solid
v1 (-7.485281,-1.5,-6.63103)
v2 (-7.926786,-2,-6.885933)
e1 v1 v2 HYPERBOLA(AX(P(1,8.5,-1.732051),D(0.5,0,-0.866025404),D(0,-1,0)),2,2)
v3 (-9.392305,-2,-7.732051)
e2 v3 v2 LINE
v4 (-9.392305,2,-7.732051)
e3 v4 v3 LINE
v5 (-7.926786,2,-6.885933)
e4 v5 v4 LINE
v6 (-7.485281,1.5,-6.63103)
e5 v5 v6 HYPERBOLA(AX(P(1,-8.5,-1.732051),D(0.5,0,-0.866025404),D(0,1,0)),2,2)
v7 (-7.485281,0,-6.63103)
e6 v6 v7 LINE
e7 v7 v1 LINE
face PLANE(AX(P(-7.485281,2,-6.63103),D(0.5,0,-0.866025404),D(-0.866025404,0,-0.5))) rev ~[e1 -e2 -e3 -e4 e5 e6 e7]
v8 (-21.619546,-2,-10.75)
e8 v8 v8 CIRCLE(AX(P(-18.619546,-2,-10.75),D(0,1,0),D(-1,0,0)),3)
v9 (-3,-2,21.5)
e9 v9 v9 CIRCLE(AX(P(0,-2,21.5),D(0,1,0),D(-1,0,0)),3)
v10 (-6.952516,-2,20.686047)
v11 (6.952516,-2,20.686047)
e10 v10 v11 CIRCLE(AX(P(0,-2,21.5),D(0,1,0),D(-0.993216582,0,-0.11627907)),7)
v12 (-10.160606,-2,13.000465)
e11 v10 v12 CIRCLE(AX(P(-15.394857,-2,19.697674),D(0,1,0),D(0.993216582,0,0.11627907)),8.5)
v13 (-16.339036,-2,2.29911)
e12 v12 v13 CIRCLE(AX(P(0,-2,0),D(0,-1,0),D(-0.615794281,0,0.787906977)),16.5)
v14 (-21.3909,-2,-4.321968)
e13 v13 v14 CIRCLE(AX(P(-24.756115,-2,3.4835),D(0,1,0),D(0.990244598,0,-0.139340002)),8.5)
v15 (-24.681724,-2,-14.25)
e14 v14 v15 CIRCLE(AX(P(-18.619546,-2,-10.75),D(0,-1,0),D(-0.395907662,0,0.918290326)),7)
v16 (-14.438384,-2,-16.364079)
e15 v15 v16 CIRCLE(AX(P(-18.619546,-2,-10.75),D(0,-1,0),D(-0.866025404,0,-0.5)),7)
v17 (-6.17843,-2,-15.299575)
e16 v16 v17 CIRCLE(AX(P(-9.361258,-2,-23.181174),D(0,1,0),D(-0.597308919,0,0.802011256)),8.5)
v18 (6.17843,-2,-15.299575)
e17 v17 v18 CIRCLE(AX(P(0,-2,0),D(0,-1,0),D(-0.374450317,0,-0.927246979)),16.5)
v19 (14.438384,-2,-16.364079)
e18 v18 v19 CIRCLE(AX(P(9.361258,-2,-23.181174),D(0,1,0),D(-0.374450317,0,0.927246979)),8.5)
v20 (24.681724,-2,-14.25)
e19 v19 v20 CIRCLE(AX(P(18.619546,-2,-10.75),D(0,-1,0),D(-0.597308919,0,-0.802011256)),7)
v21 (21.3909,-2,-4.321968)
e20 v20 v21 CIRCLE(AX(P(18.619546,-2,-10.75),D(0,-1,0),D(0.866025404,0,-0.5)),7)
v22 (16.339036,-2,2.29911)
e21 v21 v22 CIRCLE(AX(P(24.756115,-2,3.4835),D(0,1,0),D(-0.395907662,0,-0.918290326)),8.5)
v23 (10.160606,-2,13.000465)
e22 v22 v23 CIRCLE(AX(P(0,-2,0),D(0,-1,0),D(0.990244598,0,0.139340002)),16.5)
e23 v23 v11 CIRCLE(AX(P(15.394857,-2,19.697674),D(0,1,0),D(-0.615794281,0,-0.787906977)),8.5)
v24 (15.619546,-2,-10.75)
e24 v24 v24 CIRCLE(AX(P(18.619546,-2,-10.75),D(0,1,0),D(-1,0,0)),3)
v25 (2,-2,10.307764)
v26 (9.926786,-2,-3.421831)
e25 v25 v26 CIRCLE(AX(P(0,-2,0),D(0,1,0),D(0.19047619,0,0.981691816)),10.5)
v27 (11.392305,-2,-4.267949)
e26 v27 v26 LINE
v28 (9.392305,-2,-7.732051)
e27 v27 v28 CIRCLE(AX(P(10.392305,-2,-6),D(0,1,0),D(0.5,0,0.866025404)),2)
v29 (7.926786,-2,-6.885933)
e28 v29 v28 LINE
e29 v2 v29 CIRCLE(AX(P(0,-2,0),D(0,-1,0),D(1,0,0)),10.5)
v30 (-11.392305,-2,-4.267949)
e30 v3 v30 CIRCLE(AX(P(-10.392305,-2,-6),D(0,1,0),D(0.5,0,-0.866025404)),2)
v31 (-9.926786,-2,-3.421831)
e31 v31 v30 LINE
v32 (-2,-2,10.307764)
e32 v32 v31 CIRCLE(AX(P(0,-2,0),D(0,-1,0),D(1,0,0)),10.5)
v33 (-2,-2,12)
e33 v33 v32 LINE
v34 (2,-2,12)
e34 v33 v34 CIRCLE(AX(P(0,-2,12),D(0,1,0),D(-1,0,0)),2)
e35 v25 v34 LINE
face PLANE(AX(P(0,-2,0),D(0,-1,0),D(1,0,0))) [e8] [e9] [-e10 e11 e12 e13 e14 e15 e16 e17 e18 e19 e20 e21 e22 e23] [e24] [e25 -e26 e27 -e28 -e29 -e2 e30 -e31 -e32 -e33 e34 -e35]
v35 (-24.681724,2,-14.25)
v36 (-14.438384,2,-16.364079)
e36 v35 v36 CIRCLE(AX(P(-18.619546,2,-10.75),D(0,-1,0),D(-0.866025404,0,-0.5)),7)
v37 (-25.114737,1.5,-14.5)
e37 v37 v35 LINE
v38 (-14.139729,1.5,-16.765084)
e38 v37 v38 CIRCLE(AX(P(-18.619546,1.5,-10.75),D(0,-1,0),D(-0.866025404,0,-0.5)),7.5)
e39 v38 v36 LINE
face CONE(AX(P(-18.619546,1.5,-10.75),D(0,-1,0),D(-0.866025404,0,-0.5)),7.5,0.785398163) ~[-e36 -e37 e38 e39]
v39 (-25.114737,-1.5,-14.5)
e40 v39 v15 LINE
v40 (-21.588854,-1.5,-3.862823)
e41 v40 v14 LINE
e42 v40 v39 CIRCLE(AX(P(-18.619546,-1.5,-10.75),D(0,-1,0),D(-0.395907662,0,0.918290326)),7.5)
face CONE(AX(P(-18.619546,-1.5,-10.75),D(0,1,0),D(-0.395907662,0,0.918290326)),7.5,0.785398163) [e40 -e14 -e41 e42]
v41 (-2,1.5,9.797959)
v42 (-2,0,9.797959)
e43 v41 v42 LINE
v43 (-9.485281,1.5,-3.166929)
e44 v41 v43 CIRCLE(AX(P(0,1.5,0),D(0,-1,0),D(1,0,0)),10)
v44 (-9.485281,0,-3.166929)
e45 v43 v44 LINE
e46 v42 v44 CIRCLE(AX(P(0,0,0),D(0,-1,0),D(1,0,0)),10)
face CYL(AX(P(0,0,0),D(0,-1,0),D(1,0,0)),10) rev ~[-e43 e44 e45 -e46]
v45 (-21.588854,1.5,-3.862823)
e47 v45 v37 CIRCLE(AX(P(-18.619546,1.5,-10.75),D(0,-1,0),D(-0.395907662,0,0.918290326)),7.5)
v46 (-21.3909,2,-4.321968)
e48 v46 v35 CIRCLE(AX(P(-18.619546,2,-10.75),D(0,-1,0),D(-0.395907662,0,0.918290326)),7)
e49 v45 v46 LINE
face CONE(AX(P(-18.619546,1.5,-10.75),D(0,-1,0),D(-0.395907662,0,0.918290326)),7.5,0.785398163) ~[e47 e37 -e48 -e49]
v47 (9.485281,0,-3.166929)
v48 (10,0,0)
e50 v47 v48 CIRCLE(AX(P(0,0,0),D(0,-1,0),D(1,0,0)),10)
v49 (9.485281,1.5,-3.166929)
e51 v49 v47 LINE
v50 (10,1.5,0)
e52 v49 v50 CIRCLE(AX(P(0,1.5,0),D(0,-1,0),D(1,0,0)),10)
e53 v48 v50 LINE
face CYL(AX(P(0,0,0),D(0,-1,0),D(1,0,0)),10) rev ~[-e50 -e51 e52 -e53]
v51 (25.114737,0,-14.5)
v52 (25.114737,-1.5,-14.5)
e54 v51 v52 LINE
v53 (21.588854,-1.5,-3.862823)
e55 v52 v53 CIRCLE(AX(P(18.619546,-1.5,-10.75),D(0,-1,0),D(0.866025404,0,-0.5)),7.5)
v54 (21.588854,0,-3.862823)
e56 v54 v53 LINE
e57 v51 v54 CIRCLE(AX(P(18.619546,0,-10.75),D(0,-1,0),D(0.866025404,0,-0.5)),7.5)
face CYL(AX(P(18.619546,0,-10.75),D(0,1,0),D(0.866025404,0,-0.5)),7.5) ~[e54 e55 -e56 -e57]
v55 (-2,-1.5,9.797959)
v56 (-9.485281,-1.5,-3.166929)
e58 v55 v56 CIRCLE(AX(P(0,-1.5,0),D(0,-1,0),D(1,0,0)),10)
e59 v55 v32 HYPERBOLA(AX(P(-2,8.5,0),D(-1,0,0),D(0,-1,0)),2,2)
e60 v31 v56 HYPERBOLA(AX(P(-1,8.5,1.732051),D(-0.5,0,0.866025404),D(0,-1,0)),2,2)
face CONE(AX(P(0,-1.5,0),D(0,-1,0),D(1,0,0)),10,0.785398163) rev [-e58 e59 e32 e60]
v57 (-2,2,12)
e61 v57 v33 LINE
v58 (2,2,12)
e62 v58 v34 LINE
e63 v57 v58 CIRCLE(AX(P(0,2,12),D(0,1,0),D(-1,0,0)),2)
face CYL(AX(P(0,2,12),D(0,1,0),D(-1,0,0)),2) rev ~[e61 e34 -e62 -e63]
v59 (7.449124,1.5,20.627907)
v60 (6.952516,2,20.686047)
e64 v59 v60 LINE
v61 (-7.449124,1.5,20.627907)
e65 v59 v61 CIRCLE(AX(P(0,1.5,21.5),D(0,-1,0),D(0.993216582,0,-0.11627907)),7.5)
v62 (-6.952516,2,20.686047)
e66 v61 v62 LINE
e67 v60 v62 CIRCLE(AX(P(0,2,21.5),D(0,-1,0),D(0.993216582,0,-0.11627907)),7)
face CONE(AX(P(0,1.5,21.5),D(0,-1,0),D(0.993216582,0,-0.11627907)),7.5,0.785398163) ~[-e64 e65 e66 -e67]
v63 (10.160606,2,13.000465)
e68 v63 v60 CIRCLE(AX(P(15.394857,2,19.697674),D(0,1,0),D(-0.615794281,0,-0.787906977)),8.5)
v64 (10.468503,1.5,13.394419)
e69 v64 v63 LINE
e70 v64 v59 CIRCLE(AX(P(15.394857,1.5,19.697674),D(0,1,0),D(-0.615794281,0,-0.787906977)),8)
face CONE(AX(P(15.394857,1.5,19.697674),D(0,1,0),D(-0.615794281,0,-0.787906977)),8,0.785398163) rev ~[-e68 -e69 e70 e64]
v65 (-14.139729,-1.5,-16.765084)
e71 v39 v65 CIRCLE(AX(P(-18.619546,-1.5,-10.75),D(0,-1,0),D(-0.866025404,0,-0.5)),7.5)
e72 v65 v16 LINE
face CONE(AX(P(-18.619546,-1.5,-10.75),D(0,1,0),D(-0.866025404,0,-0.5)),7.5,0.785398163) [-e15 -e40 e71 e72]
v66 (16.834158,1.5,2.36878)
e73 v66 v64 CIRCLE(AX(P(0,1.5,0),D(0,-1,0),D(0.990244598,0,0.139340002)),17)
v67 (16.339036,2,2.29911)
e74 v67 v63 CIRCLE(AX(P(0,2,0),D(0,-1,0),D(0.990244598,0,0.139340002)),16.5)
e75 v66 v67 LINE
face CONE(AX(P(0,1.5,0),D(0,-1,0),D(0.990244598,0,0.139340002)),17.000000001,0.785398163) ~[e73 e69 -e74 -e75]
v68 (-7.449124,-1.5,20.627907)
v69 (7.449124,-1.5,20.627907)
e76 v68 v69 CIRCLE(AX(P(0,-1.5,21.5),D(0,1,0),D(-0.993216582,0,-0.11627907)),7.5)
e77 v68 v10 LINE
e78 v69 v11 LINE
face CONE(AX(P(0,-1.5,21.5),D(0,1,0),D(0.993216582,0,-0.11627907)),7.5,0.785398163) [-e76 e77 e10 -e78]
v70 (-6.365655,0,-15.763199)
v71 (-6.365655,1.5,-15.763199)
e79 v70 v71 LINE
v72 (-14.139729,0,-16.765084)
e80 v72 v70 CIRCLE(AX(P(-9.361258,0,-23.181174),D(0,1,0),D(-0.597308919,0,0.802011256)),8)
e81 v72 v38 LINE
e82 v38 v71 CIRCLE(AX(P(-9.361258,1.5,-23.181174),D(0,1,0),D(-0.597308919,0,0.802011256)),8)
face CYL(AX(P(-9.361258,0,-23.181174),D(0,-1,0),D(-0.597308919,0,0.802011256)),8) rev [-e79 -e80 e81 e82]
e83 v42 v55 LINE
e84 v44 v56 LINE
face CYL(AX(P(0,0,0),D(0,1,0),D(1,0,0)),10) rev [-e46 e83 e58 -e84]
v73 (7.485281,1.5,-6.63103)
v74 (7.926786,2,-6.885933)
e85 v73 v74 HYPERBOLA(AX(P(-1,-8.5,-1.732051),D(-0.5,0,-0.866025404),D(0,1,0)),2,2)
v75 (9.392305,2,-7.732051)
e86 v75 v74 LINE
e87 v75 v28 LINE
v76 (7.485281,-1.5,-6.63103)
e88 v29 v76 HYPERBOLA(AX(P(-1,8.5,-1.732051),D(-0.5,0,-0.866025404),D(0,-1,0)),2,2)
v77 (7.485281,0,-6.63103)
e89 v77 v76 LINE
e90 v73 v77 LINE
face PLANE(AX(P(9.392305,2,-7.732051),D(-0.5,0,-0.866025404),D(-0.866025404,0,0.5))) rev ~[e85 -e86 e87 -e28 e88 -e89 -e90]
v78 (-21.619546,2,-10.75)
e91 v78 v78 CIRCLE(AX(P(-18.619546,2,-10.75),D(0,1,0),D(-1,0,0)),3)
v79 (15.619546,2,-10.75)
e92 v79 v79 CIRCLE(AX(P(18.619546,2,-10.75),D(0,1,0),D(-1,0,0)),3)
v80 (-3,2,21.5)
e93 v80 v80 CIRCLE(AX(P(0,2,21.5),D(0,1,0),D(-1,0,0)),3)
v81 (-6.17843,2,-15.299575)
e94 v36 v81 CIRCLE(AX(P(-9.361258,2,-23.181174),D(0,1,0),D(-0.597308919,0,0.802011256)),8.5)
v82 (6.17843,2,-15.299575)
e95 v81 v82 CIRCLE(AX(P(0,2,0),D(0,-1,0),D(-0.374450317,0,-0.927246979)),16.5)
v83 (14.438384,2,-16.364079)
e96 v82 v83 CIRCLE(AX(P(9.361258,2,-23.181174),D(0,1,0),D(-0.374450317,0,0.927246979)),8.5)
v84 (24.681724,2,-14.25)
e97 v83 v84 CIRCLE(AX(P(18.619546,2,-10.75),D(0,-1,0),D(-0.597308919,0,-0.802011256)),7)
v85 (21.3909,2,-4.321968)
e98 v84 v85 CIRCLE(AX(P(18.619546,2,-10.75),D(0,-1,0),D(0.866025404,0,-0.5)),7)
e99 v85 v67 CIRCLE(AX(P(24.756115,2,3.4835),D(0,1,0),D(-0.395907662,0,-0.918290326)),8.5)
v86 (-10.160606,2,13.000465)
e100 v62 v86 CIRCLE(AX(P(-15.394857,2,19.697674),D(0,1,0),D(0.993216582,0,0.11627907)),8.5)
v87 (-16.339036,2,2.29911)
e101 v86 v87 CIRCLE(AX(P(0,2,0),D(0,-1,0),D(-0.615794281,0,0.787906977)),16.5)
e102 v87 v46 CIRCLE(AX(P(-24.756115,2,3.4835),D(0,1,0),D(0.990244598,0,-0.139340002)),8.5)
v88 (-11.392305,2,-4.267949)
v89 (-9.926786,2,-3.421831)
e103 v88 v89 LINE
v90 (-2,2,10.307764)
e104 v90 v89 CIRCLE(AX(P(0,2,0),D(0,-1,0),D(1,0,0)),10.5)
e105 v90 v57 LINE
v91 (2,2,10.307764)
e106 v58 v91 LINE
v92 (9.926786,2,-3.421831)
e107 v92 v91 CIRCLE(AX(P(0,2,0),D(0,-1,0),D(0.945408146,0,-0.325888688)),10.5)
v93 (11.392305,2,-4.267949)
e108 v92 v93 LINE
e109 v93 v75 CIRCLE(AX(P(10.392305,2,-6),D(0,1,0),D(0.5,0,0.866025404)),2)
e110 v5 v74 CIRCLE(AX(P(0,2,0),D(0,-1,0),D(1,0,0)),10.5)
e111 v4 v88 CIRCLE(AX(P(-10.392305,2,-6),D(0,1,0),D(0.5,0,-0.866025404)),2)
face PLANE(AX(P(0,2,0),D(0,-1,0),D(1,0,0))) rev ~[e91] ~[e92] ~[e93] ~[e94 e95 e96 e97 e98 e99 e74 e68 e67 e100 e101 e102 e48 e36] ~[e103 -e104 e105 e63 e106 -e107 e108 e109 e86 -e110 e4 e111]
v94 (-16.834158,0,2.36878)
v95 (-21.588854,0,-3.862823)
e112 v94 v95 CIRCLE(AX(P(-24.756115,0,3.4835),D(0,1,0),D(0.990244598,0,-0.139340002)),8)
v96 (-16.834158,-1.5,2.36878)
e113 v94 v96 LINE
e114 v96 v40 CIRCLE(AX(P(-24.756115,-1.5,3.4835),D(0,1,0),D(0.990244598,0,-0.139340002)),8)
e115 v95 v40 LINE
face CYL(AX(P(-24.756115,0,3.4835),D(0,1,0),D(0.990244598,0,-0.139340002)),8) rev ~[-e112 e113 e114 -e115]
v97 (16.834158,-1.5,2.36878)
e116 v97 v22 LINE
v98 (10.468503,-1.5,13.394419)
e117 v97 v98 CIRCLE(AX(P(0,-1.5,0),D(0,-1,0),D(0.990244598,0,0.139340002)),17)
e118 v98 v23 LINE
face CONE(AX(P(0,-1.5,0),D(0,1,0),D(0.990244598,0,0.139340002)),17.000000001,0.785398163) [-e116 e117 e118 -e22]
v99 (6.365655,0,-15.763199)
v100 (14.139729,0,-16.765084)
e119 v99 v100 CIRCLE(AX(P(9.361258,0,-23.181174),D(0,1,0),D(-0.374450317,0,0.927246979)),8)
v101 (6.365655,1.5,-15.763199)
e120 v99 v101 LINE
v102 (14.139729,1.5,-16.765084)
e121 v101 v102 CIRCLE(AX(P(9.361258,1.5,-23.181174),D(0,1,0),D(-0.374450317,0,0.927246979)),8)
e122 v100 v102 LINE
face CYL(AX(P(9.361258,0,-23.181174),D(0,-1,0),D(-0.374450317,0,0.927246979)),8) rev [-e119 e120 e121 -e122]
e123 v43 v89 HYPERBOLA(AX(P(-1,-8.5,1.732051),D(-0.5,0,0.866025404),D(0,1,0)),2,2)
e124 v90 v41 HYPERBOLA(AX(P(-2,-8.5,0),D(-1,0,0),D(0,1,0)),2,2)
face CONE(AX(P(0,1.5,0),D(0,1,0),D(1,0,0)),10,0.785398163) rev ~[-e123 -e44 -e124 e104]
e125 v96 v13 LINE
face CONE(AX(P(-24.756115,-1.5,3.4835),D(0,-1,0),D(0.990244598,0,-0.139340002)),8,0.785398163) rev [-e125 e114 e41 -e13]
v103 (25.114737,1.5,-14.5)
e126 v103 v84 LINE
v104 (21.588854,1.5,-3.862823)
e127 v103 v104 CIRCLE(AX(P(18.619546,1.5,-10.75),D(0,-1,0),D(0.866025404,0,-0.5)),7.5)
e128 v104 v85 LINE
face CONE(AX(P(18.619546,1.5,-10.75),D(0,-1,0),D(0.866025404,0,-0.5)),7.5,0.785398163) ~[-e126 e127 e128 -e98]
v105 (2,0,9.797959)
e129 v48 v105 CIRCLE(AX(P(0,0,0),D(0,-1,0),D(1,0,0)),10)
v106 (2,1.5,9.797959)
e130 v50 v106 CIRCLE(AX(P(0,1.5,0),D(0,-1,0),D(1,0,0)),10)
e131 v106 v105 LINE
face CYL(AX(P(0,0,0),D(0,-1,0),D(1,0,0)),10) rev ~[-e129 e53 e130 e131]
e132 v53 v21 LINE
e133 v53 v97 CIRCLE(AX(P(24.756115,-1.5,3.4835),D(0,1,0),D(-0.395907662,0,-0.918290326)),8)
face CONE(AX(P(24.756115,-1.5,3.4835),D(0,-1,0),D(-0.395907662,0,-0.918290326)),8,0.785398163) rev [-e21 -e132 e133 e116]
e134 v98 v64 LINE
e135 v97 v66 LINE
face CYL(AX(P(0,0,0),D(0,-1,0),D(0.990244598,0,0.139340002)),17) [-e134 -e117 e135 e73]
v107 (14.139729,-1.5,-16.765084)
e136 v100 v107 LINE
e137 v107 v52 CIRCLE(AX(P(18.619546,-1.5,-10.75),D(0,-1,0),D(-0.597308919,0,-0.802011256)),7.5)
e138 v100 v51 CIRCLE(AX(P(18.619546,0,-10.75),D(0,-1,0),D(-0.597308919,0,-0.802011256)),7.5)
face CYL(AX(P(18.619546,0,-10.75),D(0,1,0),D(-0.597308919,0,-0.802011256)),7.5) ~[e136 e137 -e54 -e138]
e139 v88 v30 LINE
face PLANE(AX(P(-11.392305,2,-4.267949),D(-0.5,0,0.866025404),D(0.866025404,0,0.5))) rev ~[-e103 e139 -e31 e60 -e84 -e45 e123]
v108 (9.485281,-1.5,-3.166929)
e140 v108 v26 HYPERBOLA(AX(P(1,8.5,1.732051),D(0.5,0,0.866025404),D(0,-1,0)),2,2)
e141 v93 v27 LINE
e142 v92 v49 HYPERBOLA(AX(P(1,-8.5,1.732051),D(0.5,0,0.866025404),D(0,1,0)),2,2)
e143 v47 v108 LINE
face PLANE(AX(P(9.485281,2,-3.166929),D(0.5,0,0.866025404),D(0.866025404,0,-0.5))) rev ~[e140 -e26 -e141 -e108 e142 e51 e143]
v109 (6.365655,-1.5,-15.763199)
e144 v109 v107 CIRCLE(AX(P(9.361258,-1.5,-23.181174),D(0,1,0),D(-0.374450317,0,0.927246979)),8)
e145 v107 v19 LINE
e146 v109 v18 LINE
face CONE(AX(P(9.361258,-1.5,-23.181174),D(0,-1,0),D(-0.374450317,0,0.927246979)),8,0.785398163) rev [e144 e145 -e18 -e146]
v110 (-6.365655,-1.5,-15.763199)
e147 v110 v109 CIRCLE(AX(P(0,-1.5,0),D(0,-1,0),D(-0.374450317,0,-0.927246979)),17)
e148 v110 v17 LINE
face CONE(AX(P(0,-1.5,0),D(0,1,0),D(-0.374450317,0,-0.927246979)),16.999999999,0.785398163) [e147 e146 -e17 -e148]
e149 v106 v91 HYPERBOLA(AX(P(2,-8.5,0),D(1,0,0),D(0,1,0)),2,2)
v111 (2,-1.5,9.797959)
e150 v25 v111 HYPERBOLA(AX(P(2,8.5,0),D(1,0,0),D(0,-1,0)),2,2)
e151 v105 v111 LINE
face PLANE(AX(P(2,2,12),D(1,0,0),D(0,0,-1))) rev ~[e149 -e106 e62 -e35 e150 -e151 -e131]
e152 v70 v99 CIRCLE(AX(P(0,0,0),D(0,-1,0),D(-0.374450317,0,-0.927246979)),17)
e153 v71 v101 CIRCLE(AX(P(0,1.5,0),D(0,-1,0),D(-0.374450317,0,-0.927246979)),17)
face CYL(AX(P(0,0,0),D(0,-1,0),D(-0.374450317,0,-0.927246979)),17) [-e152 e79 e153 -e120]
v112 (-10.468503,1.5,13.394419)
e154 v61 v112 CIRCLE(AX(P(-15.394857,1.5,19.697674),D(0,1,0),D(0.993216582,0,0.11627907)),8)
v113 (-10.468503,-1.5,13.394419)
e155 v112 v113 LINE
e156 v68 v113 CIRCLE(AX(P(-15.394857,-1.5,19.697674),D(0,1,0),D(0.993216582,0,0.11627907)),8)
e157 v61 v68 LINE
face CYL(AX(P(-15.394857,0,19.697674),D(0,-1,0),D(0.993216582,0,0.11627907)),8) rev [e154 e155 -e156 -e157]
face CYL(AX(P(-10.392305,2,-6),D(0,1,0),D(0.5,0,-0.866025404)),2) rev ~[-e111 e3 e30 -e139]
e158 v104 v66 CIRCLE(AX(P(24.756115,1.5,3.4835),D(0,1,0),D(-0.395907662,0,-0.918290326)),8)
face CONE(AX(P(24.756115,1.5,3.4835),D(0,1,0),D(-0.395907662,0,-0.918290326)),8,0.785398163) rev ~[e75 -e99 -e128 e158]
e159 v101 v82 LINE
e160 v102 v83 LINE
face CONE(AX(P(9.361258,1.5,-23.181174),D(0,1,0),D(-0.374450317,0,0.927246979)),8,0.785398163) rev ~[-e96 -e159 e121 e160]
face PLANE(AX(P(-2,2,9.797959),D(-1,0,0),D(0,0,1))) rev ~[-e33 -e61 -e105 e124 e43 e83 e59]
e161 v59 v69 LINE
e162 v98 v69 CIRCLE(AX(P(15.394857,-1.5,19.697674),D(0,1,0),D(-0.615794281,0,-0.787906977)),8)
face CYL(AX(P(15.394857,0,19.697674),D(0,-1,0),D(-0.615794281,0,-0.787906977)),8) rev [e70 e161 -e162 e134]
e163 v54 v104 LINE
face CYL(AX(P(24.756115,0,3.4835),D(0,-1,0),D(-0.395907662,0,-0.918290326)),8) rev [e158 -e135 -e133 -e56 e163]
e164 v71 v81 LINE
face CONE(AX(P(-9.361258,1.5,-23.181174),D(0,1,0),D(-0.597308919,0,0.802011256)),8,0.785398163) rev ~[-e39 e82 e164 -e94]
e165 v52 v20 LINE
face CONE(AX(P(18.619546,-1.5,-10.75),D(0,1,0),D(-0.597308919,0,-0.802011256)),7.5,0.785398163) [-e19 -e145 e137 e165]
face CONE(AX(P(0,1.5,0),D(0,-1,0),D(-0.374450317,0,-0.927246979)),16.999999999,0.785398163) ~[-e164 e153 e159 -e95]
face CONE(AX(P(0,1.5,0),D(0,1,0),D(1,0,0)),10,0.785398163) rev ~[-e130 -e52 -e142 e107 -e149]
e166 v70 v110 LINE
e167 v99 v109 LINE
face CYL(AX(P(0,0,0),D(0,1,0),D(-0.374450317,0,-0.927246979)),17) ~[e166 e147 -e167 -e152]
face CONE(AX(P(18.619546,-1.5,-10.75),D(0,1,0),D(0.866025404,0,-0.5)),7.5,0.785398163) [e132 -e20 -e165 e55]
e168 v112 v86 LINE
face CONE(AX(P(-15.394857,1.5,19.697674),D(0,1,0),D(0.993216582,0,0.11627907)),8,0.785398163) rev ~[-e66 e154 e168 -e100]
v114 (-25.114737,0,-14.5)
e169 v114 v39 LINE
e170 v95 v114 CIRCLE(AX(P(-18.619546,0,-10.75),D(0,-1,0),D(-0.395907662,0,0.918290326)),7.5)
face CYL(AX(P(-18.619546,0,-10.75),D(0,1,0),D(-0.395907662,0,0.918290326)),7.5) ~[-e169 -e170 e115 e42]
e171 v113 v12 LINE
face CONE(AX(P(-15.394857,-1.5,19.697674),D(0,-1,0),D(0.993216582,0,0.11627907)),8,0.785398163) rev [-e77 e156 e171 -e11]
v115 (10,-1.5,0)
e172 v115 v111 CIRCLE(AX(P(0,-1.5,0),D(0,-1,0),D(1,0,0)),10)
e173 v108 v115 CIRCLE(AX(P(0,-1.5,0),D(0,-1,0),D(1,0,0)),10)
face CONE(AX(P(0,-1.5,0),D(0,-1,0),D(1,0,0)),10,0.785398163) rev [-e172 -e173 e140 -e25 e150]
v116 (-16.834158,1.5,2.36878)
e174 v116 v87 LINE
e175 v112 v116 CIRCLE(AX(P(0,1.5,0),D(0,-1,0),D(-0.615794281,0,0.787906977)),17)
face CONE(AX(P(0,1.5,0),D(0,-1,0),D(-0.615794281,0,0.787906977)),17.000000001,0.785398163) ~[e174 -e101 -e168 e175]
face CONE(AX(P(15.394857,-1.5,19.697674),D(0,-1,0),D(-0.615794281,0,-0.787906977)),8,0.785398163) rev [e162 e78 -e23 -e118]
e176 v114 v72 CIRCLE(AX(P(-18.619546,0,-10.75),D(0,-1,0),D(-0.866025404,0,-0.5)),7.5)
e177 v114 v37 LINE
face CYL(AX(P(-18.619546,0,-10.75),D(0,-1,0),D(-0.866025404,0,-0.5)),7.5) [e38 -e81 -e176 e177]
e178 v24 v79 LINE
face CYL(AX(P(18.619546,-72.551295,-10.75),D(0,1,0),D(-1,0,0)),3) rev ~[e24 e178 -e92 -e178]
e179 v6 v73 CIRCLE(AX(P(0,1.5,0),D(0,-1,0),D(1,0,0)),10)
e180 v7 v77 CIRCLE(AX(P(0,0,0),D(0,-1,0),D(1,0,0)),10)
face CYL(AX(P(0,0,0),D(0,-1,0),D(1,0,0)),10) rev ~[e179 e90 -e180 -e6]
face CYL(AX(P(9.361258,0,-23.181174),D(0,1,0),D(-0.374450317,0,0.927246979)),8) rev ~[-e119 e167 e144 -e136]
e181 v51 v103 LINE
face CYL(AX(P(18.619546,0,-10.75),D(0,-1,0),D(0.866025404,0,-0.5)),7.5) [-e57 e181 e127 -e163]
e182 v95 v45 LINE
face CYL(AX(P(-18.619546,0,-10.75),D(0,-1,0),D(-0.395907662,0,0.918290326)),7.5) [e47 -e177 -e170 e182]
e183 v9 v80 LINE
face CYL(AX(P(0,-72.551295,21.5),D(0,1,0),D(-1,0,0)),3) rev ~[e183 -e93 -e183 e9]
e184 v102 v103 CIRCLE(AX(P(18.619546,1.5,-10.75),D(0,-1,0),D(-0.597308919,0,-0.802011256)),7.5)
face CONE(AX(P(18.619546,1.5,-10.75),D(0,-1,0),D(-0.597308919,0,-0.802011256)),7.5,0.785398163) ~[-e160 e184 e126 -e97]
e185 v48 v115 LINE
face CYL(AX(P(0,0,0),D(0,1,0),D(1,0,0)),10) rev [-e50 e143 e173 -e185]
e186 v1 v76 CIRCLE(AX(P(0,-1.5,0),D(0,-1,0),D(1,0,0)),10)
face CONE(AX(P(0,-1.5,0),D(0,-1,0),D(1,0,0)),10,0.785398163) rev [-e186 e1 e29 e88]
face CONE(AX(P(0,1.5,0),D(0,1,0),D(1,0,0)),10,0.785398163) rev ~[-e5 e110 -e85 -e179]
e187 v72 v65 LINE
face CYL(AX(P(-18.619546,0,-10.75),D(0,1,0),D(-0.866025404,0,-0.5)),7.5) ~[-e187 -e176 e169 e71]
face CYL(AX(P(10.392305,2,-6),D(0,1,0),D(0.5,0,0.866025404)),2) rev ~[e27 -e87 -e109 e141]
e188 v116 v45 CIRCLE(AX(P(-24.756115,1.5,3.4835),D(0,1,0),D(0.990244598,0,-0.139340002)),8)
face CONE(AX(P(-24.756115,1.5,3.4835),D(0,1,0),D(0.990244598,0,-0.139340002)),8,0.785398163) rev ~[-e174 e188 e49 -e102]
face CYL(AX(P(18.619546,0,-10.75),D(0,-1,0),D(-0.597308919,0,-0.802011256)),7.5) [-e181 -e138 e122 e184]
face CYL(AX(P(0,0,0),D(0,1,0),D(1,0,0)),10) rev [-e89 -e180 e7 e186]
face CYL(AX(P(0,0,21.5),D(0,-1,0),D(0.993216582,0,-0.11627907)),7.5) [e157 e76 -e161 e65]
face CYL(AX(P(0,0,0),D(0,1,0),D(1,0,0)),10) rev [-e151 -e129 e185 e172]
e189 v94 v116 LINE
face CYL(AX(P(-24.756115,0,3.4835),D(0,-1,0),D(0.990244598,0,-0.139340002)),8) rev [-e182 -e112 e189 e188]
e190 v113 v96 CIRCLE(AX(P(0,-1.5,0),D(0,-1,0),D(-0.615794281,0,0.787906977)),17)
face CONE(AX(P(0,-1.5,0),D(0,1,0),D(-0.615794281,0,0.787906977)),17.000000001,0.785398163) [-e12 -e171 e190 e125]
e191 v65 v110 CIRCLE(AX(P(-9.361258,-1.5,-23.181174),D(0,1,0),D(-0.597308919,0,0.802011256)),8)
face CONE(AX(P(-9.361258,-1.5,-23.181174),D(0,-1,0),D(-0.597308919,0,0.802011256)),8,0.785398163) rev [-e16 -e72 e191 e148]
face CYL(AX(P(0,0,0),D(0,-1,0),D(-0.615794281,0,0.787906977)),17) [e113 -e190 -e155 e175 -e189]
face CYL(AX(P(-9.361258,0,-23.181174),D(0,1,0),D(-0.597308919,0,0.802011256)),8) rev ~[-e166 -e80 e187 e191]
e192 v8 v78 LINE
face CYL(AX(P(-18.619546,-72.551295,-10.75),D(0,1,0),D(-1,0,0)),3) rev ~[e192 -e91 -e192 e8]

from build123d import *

# Parameters (mm, degrees)
F0_R          = 10
F1_DEPTH      = 2
F1_DEPTH_BACK = 2
F3_D          = 6
F4_SIZE       = 0.5
F7_DEPTH      = 4.001


# Not quite as in the source:
# - two fillets or chamfers of one size are made in one step


with BuildPart() as f1:
    # F0 (on Front) → F1 (new body, two sides)
    with BuildSketch(Plane.XZ) as f1_sk:
        with BuildLine():
            ThreePointArc((10.4685027699, 13.3944186047), (8.0122088596, 16.6160342353), (7.4491243619, 20.6279069767))
            ThreePointArc((7.4491243619, 20.6279069767), (5.6031552573, 26.4854439284), (0, 29))
            ThreePointArc((0, 29), (-5.6031552573, 26.4854439284), (-7.4491243619, 20.6279069767))
            ThreePointArc((-7.4491243619, 20.6279069767), (-8.0122088596, 16.6160342353), (-10.4685027699, 13.3944186047))
            ThreePointArc((-10.4685027699, 13.3944186047), (-14.7224318643, 8.5), (-16.8341581655, 2.368780036))
            ThreePointArc((-16.8341581655, 2.368780036), (-18.3960121877, -1.3692407048), (-21.5888536497, -3.862822555))
            ThreePointArc((-21.5888536497, -3.862822555), (-25.7386449011, -8.39024717), (-25.1147367097, -14.5))
            ThreePointArc((-25.1147367097, -14.5), (-20.1354896438, -18.0951967583), (-14.1397292878, -16.7650844217))
            ThreePointArc((-14.1397292878, -16.7650844217), (-10.3838033281, -15.2467935304), (-6.3656553956, -15.7631986406))
            ThreePointArc((-6.3656553956, -15.7631986406), (0, -17), (6.3656553956, -15.7631986406))
            ThreePointArc((6.3656553956, -15.7631986406), (10.3838033281, -15.2467935304), (14.1397292878, -16.7650844217))
            ThreePointArc((14.1397292878, -16.7650844217), (20.1354896438, -18.0951967583), (25.1147367097, -14.5))
            ThreePointArc((25.1147367097, -14.5), (25.7386449011, -8.39024717), (21.5888536497, -3.862822555))
            ThreePointArc((21.5888536497, -3.862822555), (18.3960121877, -1.3692407048), (16.8341581655, 2.368780036))
            ThreePointArc((16.8341581655, 2.368780036), (14.7224318643, 8.5), (10.4685027699, 13.3944186047))
        make_face()
        Circle(F0_R, mode=Mode.SUBTRACT)
    extrude(amount=F1_DEPTH)
    extrude(f1_sk.sketch, amount=-F1_DEPTH_BACK)

    # F3 (through all)
    with Locations(Plane.XZ.offset(2)):
        with Locations((0, 21.5), (-18.6195461814, -10.75), (18.6195461814, -10.75)):
            Hole(F3_D / 2)

    # F4
    f4_edges = [f1.edges().sort_by_distance(p)[0] for p in [
        (-10, -2, 0),
        (10, 0, 0),
        (-10, 2, 0),
        (8.012209, -2, 16.616034),
        (8.012209, 2, 16.616034),
        (14.722432, -2, 8.5),
        (14.722432, 2, 8.5),
        (0, -2, 29),
        (18.396012, -2, -1.369241),
        (-8.012209, -2, 16.616034),
        (25.114737, -2, -14.5),
        (-14.722432, -2, 8.5),
        (10.383803, -2, -15.246794),
        (-18.396012, -2, -1.369241),
        (0, -2, -17),
        (-25.114737, -2, -14.5),
        (-10.383803, -2, -15.246794),
        (0, 2, 29),
        (18.396012, 2, -1.369241),
        (-8.012209, 2, 16.616034),
        (25.114737, 2, -14.5),
        (-14.722432, 2, 8.5),
        (10.383803, 2, -15.246794),
        (-18.396012, 2, -1.369241),
        (0, 2, -17),
        (-25.114737, 2, -14.5),
        (-10.383803, 2, -15.246794),
    ]]
    chamfer(f4_edges, length=F4_SIZE)

    # F6 (on face) → F7 (cut, through all)
    with BuildSketch(Plane(origin=(0, 2, 0), x_dir=(-1, 0, 0), z_dir=(0, 1, 0))):
        with BuildLine():
            ThreePointArc((-2, 9.7979589711), (0, 10), (2, 9.7979589711))
            Line((2, 9.7979589711), (2, 12))
            ThreePointArc((2, 12), (0, 14), (-2, 12))
            Line((-2, 12), (-2, 9.7979589711))
        make_face()
        with BuildLine():
            Line((-9.3923048454, -7.7320508076), (-7.4852813742, -6.6310302931))
            ThreePointArc((-7.4852813742, -6.6310302931), (-8.6602540378, -5), (-9.4852813742, -3.166928678))
            Line((-9.4852813742, -3.166928678), (-11.3923048454, -4.2679491924))
            ThreePointArc((-11.3923048454, -4.2679491924), (-12.124355653, -7), (-9.3923048454, -7.7320508076))
        make_face()
        with BuildLine():
            Line((11.3923048454, -4.2679491924), (9.4852813742, -3.166928678))
            ThreePointArc((9.4852813742, -3.166928678), (8.6602540378, -5), (7.4852813742, -6.6310302931))
            Line((7.4852813742, -6.6310302931), (9.3923048454, -7.7320508076))
            ThreePointArc((9.3923048454, -7.7320508076), (12.124355653, -7), (11.3923048454, -4.2679491924))
        make_face()
    extrude(amount=-F7_DEPTH, mode=Mode.SUBTRACT)


solid = f1.part
